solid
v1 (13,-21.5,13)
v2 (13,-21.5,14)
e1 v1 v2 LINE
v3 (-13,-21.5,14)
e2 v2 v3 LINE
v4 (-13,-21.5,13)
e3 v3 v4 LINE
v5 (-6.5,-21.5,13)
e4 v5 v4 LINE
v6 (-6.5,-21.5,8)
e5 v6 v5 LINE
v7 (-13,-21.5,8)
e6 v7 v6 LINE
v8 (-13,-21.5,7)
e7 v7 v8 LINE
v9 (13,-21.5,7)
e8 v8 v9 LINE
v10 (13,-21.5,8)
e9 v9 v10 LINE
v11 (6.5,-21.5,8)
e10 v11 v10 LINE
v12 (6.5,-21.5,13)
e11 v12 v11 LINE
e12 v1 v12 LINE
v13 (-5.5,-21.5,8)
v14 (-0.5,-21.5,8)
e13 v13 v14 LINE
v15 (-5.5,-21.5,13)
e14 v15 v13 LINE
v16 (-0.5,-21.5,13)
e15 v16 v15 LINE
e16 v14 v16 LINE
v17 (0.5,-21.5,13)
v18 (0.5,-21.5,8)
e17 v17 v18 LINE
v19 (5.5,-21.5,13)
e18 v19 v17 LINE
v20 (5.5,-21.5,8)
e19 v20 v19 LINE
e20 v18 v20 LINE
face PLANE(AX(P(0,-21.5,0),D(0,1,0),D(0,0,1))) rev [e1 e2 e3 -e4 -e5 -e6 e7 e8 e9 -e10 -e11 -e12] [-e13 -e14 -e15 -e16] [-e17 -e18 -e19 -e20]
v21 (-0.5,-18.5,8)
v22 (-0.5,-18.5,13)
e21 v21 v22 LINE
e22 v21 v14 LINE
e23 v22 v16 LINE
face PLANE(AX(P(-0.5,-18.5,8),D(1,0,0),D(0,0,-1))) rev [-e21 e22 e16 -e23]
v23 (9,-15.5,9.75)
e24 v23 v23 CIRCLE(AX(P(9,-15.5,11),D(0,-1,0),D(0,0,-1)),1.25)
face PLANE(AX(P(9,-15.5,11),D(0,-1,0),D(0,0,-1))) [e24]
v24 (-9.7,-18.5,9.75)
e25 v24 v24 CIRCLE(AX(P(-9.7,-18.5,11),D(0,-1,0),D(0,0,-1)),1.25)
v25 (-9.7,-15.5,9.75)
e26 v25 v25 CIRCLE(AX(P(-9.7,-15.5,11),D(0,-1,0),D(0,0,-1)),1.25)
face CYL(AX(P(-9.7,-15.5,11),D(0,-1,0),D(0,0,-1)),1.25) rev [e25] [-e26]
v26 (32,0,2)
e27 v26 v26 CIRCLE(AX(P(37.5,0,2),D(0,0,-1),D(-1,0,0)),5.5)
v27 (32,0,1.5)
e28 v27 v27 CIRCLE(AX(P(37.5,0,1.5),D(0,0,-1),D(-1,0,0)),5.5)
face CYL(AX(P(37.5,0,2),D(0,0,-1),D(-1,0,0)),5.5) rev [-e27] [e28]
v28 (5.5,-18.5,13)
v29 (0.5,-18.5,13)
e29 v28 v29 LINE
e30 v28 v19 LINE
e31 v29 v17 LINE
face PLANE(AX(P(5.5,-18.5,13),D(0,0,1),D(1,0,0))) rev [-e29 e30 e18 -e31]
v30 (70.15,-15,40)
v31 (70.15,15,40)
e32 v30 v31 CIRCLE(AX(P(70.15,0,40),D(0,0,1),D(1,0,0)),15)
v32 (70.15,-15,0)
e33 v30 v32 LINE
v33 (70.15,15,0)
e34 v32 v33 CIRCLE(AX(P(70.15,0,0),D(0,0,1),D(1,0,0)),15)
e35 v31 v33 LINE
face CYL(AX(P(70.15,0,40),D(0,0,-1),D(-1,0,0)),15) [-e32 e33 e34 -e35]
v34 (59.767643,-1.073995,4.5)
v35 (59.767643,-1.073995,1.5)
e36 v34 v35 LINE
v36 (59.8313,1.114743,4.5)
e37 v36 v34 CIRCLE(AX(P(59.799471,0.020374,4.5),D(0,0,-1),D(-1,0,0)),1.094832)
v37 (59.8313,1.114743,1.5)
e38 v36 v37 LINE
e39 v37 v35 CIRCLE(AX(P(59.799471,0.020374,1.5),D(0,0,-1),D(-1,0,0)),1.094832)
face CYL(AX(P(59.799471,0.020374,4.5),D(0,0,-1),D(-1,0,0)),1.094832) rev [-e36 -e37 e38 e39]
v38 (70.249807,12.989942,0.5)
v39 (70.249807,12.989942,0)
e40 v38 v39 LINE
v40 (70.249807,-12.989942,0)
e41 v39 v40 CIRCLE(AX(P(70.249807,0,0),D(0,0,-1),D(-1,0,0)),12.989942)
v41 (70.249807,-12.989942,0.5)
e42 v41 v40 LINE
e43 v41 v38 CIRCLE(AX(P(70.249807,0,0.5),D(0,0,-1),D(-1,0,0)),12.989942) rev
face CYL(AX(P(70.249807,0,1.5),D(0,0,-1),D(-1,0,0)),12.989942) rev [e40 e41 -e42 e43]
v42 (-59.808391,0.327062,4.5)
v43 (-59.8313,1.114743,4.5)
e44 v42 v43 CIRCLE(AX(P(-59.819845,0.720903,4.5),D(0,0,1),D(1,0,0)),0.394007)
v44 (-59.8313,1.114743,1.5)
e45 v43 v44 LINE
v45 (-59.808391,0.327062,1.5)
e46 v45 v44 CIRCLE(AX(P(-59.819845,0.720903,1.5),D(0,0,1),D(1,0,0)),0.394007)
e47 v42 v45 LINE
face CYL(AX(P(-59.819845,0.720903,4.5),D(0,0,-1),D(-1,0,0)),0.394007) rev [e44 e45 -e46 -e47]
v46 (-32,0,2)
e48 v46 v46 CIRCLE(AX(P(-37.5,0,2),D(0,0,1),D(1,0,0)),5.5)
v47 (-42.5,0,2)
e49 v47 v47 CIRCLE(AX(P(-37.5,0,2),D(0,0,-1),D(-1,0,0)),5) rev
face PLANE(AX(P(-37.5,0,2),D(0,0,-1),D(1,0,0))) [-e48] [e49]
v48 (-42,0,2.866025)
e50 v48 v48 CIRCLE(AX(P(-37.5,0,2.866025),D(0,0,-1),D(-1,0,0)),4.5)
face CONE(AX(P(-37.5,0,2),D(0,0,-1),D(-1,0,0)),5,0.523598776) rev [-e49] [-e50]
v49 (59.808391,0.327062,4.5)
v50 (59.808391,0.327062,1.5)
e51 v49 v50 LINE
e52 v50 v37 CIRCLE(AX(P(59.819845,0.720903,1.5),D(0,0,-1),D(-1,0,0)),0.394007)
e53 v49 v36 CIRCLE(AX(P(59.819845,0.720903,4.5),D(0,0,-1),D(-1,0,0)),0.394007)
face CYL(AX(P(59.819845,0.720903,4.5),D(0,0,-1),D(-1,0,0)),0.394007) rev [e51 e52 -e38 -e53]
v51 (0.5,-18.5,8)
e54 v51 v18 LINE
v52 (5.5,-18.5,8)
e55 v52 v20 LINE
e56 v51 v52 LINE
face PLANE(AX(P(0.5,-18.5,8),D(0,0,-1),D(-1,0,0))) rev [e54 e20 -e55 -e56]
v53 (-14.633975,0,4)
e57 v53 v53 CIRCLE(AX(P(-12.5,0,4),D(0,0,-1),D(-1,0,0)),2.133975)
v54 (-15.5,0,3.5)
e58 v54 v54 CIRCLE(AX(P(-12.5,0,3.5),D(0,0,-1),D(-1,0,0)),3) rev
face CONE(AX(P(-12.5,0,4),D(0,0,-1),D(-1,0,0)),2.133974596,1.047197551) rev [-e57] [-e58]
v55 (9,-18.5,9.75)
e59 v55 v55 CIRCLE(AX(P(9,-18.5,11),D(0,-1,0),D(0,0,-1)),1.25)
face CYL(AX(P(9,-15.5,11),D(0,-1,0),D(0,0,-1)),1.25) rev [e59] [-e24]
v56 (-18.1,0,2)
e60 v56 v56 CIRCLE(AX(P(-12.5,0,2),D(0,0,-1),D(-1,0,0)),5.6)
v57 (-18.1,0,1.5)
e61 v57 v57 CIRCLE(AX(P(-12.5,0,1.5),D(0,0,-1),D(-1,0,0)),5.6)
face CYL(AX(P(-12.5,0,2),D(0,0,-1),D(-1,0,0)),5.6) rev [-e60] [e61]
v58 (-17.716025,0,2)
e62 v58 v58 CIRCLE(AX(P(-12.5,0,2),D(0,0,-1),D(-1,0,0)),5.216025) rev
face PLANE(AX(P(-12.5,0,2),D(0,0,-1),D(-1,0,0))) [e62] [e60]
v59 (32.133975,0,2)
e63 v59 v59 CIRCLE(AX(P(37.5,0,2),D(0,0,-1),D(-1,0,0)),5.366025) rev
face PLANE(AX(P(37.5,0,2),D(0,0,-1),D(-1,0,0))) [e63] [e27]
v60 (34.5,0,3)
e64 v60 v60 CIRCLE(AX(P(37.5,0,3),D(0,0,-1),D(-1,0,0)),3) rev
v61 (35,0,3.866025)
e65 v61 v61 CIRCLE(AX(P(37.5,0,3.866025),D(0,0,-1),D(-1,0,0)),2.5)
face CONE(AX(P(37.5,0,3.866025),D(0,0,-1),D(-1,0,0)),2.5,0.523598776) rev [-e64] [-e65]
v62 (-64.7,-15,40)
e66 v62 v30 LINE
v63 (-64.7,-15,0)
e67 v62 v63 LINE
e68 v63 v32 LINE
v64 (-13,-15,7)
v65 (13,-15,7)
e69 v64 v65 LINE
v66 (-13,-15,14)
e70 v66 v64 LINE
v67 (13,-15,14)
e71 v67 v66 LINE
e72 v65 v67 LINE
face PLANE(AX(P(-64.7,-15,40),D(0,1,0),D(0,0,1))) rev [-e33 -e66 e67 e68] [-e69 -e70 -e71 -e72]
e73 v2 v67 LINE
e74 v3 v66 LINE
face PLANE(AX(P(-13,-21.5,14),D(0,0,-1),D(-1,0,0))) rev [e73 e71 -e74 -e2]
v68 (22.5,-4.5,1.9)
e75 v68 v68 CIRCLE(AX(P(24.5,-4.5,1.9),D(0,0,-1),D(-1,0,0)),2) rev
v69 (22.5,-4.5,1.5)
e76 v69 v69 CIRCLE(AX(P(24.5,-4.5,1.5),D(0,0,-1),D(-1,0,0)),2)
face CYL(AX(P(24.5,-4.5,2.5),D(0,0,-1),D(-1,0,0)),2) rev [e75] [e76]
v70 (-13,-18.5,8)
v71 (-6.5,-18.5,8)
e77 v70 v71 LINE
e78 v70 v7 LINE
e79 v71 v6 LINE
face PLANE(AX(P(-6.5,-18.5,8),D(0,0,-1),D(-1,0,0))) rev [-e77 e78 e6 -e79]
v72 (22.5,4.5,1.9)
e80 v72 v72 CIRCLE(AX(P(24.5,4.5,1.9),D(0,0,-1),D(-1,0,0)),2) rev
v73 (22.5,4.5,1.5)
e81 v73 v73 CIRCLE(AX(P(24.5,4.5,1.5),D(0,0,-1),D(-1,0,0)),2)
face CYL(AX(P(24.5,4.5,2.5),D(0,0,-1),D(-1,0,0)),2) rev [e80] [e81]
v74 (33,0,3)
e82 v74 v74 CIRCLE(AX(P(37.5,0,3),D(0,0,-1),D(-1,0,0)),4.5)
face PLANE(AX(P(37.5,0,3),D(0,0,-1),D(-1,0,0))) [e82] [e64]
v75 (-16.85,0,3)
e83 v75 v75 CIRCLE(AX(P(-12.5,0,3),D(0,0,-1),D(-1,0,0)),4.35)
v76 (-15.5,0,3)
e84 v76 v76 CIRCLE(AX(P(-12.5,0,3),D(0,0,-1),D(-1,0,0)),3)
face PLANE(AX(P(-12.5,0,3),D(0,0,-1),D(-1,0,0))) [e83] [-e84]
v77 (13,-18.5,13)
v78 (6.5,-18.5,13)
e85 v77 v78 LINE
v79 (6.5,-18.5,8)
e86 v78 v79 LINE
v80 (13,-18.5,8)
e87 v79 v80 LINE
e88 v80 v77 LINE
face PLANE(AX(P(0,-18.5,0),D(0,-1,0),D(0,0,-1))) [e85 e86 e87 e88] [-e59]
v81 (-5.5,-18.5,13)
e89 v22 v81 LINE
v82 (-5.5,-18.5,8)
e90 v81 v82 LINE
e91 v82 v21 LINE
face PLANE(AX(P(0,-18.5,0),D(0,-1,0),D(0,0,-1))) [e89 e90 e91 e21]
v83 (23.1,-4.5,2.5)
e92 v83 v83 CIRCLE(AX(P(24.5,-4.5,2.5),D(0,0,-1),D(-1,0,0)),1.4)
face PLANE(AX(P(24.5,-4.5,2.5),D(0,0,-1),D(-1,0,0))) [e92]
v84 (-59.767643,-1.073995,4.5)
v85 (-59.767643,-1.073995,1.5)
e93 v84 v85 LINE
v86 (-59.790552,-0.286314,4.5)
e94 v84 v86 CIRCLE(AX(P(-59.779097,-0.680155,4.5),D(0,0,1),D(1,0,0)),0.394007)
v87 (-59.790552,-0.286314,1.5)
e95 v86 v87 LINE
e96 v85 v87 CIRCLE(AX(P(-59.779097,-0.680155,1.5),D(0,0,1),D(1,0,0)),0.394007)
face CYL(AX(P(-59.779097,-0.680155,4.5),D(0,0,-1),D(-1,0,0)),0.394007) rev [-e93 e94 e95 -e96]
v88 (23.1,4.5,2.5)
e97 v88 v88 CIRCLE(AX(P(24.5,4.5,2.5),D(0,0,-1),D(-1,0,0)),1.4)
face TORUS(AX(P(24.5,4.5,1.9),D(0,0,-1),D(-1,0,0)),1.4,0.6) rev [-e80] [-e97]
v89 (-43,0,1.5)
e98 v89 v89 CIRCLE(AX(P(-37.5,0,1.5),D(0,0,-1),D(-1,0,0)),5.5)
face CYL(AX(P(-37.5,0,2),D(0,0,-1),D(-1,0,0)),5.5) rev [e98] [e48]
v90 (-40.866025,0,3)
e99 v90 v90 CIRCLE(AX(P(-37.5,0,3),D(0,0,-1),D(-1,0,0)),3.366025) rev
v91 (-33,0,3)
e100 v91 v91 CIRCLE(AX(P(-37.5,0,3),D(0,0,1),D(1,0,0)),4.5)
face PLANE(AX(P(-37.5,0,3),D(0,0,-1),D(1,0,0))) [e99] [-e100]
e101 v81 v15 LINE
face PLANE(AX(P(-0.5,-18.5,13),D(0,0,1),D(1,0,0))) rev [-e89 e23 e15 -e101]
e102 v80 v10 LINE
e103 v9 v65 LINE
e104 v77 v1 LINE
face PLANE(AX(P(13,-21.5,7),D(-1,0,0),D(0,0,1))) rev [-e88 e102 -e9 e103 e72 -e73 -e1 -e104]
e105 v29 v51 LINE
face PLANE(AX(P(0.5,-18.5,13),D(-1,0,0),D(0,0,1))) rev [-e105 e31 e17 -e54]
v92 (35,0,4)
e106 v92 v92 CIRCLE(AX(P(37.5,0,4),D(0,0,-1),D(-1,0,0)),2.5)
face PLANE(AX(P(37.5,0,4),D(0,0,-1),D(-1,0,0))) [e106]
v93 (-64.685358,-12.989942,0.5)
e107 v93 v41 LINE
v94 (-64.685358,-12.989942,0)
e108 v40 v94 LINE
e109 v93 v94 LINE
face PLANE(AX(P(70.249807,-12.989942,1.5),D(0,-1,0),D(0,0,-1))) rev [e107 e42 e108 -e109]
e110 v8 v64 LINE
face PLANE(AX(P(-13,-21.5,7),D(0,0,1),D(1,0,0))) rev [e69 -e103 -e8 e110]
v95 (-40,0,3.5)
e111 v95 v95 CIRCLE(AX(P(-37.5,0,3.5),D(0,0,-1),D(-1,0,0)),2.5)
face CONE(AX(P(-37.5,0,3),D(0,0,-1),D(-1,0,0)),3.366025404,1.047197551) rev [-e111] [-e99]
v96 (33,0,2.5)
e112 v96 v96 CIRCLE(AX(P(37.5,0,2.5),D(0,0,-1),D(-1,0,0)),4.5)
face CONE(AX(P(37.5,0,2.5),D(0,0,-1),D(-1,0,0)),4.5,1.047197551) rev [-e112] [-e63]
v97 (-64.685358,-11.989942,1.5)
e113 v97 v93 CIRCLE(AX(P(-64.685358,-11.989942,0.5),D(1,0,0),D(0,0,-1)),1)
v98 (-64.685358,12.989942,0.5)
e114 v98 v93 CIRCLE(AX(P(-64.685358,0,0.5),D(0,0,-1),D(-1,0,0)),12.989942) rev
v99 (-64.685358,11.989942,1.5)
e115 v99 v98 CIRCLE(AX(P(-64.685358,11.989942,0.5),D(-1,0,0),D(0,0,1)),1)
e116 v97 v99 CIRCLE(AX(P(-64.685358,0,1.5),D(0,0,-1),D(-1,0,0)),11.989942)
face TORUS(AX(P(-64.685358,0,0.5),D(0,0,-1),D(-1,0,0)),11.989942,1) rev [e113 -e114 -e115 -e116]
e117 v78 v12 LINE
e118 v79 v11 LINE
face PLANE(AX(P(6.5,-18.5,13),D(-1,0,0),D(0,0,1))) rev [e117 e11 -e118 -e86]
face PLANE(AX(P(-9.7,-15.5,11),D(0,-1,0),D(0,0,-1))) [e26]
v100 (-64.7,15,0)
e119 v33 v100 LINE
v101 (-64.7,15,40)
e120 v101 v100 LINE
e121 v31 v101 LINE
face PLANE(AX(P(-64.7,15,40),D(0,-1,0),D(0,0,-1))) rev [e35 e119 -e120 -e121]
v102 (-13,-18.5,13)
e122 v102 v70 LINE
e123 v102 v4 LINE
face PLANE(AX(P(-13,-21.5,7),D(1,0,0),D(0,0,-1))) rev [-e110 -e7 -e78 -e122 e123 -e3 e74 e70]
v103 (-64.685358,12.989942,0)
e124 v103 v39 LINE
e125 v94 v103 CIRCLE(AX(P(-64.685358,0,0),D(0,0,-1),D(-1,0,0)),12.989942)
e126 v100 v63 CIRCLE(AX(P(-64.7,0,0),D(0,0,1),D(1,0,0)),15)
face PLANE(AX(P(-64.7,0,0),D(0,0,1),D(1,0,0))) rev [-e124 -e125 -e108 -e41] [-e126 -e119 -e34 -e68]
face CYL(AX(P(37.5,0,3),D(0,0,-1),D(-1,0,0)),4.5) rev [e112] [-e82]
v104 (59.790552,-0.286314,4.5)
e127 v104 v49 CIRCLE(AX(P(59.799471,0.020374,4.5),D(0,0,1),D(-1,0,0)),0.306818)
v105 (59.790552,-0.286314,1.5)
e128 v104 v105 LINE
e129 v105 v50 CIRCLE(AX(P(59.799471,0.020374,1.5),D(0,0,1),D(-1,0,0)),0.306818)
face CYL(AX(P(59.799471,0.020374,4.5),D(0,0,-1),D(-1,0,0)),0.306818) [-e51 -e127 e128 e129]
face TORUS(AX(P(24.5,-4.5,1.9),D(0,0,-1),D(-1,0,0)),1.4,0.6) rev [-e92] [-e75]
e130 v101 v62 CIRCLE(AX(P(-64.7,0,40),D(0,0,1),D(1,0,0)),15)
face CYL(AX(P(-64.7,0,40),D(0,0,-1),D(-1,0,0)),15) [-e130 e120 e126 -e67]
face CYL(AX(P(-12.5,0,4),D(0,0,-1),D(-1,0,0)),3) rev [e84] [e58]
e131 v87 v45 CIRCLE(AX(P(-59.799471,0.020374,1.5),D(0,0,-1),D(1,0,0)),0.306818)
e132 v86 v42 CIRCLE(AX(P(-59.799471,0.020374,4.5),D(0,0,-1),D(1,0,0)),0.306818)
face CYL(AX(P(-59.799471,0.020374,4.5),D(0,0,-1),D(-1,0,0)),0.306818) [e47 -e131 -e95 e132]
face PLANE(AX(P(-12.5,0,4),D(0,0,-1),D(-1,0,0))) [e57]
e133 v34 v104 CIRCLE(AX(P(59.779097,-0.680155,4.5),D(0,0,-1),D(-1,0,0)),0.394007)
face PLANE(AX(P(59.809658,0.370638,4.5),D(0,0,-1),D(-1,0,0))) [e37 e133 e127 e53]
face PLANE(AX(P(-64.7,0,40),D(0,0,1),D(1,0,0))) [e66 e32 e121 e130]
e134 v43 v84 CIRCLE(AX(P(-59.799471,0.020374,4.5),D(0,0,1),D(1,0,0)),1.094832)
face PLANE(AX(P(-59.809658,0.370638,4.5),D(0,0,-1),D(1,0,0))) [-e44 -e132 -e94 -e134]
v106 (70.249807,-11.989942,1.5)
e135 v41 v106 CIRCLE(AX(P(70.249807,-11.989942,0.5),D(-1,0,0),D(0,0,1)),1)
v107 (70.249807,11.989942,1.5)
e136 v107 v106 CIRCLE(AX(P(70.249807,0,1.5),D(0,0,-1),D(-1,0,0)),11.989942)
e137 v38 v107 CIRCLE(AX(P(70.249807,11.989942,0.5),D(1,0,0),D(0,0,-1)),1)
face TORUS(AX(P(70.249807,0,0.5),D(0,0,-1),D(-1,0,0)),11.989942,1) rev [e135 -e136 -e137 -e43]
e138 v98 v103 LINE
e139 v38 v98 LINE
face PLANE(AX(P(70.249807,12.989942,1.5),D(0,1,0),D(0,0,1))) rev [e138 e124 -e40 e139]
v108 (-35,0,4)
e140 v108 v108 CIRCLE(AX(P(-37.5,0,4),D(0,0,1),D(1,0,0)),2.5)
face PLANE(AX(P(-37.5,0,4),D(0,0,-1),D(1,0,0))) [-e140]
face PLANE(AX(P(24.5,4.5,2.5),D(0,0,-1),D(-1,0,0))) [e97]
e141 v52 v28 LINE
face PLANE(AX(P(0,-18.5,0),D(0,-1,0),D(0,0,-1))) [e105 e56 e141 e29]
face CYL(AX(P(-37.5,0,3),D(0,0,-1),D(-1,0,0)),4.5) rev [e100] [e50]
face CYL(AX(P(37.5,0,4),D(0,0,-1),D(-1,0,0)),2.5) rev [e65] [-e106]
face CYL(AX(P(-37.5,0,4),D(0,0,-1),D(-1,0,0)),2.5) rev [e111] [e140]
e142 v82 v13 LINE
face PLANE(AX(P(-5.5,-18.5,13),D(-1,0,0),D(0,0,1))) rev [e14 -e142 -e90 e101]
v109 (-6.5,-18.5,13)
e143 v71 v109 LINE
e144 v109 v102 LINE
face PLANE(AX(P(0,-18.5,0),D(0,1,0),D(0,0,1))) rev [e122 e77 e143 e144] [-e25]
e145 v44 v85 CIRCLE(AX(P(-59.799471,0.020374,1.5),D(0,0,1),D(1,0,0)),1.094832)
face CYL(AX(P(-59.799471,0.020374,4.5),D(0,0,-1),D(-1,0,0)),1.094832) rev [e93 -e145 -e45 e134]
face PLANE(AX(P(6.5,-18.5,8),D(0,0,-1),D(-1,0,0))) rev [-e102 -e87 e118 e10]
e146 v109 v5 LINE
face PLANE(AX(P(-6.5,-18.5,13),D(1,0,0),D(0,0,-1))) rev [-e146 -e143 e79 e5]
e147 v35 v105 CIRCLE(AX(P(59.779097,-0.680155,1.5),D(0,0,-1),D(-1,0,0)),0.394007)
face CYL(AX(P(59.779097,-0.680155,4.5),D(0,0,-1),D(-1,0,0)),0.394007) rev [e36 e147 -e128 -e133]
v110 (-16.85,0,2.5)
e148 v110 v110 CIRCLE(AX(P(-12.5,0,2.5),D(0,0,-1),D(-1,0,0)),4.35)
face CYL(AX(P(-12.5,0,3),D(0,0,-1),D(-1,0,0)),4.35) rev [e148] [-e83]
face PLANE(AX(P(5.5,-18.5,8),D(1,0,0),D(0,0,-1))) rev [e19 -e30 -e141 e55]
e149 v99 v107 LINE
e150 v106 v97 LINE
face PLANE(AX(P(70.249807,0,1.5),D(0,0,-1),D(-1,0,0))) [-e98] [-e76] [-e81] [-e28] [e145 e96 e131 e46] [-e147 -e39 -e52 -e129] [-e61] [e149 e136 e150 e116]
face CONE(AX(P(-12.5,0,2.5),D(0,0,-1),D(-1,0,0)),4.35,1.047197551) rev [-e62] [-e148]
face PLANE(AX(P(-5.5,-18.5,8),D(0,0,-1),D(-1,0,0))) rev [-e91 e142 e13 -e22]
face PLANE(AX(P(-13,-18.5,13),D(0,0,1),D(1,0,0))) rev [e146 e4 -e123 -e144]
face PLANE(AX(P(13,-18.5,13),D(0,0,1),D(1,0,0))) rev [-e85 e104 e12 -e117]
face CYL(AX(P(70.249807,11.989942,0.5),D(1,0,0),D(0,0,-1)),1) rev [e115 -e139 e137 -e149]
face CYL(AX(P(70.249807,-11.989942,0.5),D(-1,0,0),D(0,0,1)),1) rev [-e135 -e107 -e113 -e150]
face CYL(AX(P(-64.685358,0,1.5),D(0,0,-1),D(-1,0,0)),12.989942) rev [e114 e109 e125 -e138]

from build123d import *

# Parameters (mm, degrees)
EXTRUDE_1_DEPTH             = 40
SKETCH_2_R                  = 7.25
CUT_EXTRUDE_1_DEPTH         = 1
CHAMFER_1_SIZE              = 0.5
SKETCH_5_R                  = 5.5
CUT_EXTRUDE_2_DEPTH         = 1
CHAMFER_2_SIZE              = 0.5
CHAMFER_2_SIZE2             = 0.288675135
SKETCH_6_R                  = 4.5
CUT_EXTRUDE_3_DEPTH         = 1
CHAMFER_3_SIZE              = 0.5
CHAMFER_3_SIZE2             = 0.866025404
SKETCH_7_R                  = 2.5
CUT_EXTRUDE_4_DEPTH         = 1
CHAMFER_4_SIZE              = 0.5
CHAMFER_4_SIZE2             = 0.866025404
CHAMFER_1_OF_MIRROR_3_SIZE  = 0.5
CHAMFER_2_OF_MIRROR_3_SIZE2 = 0.288675135
CHAMFER_2_OF_MIRROR_3_SIZE  = 0.5
CHAMFER_3_OF_MIRROR_3_SIZE2 = 0.866025404
CHAMFER_3_OF_MIRROR_3_SIZE  = 0.5
CHAMFER_4_OF_MIRROR_3_SIZE2 = 0.5
CHAMFER_4_OF_MIRROR_3_SIZE  = 0.866025404
SKETCH_9_R                  = 7.25
CUT_EXTRUDE_5_DEPTH         = 1
CHAMFER_5_SIZE              = 0.5
SKETCH_10_R                 = 5.6
CUT_EXTRUDE_6_DEPTH         = 1
CHAMFER_6_SIZE              = 0.5
CHAMFER_6_SIZE2             = 0.866025404
SKETCH_11_R                 = 4.35
CUT_EXTRUDE_7_DEPTH         = 1
CHAMFER_7_SIZE              = 0.5
CHAMFER_7_SIZE2             = 0.866025404
SKETCH_12_R                 = 3
CUT_EXTRUDE_8_DEPTH         = 1
CHAMFER_8_SIZE              = 0.5
CHAMFER_8_SIZE2             = 0.866025404
CUT_EXTRUDE_9_DEPTH         = 1.5
FILLET_1_R                  = 1
SKETCH_14_R                 = 2
CUT_EXTRUDE_10_DEPTH        = 1
FILLET_2_R                  = 0.6
SKETCH_15_R                 = 2
CUT_EXTRUDE_11_DEPTH        = 1
FILLET_3_R                  = 0.6
CUT_EXTRUDE_12_DEPTH        = 3
SKETCH_17_W                 = 26
SKETCH_17_H                 = 7
EXTRUDE_2_DEPTH             = 6.5
SKETCH_18_W                 = 6.5
SKETCH_18_H                 = 5
SKETCH_18_W_2               = 5
CUT_EXTRUDE_13_DEPTH        = 3
SKETCH_19_R                 = 1.25
CUT_EXTRUDE_14_DEPTH        = 3


with BuildPart() as part:
    # 草图1 → 凸台-拉伸1 (new body)
    with BuildSketch(Plane.XY):
        with BuildLine():
            Line((-64.7, 15), (70.15, 15))
            ThreePointArc((70.15, 15), (85.15, 0), (70.15, -15))
            Line((70.15, -15), (-64.7, -15))
            ThreePointArc((-64.7, -15), (-79.7, 0), (-64.7, 15))
        make_face()
    extrude(amount=EXTRUDE_1_DEPTH)

    # 草图2 → 切除-拉伸1 (cut)
    with BuildSketch(Plane(origin=(0, 0, 0), x_dir=(-1, 0, 0), z_dir=(0, 0, -1))):
        with Locations((-37.5, 0)):
            Circle(SKETCH_2_R)
    cut_extrude_1 = extrude(amount=-CUT_EXTRUDE_1_DEPTH, mode=Mode.SUBTRACT)

    # 倒角1
    chamfer_1_edges = [part.edges().sort_by_distance(p)[0] for p in [
        (44.75, 0, 1),
        (44.75, 0, 0),
    ]]
    chamfer(chamfer_1_edges, length=CHAMFER_1_SIZE - 0.0001)  # a hair under: the kernel refuses the full size

    # 草图5 → 切除-拉伸2 (cut)
    with BuildSketch(Plane(origin=(0, 0, 1), x_dir=(-1, 0, 0), z_dir=(0, 0, -1))):
        with Locations((-37.5, 0)):
            Circle(SKETCH_5_R)
    cut_extrude_2 = extrude(amount=-CUT_EXTRUDE_2_DEPTH, mode=Mode.SUBTRACT)

    # 倒角2
    chamfer_2_edges = [part.edges().sort_by_distance(p)[0] for p in [
        (43, 0, 1),
    ]]
    chamfer_2_side = [part.faces().sort_by_distance(p)[0] for p in [
        (43, 0, 1.5),
    ]]
    chamfer(chamfer_2_edges, length=CHAMFER_2_SIZE, length2=CHAMFER_2_SIZE2, reference=chamfer_2_side[0])

    # 草图6 → 切除-拉伸3 (cut)
    with BuildSketch(Plane(origin=(0, 0, 2), x_dir=(-1, 0, 0), z_dir=(0, 0, -1))):
        with Locations((-37.5, 0)):
            Circle(SKETCH_6_R)
    cut_extrude_3 = extrude(amount=-CUT_EXTRUDE_3_DEPTH, mode=Mode.SUBTRACT)

    # 倒角3
    chamfer_3_edges = [part.edges().sort_by_distance(p)[0] for p in [
        (42, 0, 2),
    ]]
    chamfer_3_side = [part.faces().sort_by_distance(p)[0] for p in [
        (42, 0, 2.5),
    ]]
    chamfer(chamfer_3_edges, length=CHAMFER_3_SIZE, length2=CHAMFER_3_SIZE2, reference=chamfer_3_side[0])

    # 草图7 → 切除-拉伸4 (cut)
    with BuildSketch(Plane(origin=(0, 0, 3), x_dir=(-1, 0, 0), z_dir=(0, 0, -1))):
        with Locations((-37.5, 0)):
            Circle(SKETCH_7_R)
    cut_extrude_4 = extrude(amount=-CUT_EXTRUDE_4_DEPTH, mode=Mode.SUBTRACT)

    # 倒角4
    chamfer_4_edges = [part.edges().sort_by_distance(p)[0] for p in [
        (40, 0, 3),
    ]]
    chamfer_4_side = [part.faces().sort_by_distance(p)[0] for p in [
        (41.872720779, 0, 3),
    ]]
    chamfer(chamfer_4_edges, length=CHAMFER_4_SIZE, length2=CHAMFER_4_SIZE2, reference=chamfer_4_side[0])

    # 镜向3: 切除-拉伸1, 切除-拉伸2, 切除-拉伸3, 切除-拉伸4 across plane
    add(cut_extrude_1.mirror(Plane(origin=(0, 0, 0), x_dir=(0, 0, 1), z_dir=(1, 0, 0))), mode=Mode.SUBTRACT)
    add(cut_extrude_2.mirror(Plane(origin=(0, 0, 0), x_dir=(0, 0, 1), z_dir=(1, 0, 0))), mode=Mode.SUBTRACT)
    add(cut_extrude_3.mirror(Plane(origin=(0, 0, 0), x_dir=(0, 0, 1), z_dir=(1, 0, 0))), mode=Mode.SUBTRACT)
    add(cut_extrude_4.mirror(Plane(origin=(0, 0, 0), x_dir=(0, 0, 1), z_dir=(1, 0, 0))), mode=Mode.SUBTRACT)

    # 倒角1 of 镜向3
    chamfer_1_of_mirror_3_edges = [part.edges().sort_by_distance(p)[0] for p in [
        (-44.75, 0, 1),
        (-44.75, 0, 0),
    ]]
    chamfer(chamfer_1_of_mirror_3_edges, length=CHAMFER_1_OF_MIRROR_3_SIZE - 0.0001)  # a hair under: the kernel refuses the full size

    # 倒角2 of 镜向3
    chamfer_2_of_mirror_3_edges = [part.edges().sort_by_distance(p)[0] for p in [
        (-43, 0, 1),
    ]]
    chamfer(chamfer_2_of_mirror_3_edges, length=CHAMFER_2_OF_MIRROR_3_SIZE, length2=CHAMFER_2_OF_MIRROR_3_SIZE2)

    # 倒角3 of 镜向3
    chamfer_3_of_mirror_3_edges = [part.edges().sort_by_distance(p)[0] for p in [
        (-42, 0, 2),
    ]]
    chamfer(chamfer_3_of_mirror_3_edges, length=CHAMFER_3_OF_MIRROR_3_SIZE, length2=CHAMFER_3_OF_MIRROR_3_SIZE2)

    # 倒角4 of 镜向3
    chamfer_4_of_mirror_3_edges = [part.edges().sort_by_distance(p)[0] for p in [
        (-40, 0, 3),
    ]]
    chamfer(chamfer_4_of_mirror_3_edges, length=CHAMFER_4_OF_MIRROR_3_SIZE, length2=CHAMFER_4_OF_MIRROR_3_SIZE2)

    # 草图9 → 切除-拉伸5 (cut)
    with BuildSketch(Plane(origin=(0, 0, 0), x_dir=(-1, 0, 0), z_dir=(0, 0, -1))):
        with Locations((12.5, 0)):
            Circle(SKETCH_9_R)
    extrude(amount=-CUT_EXTRUDE_5_DEPTH, mode=Mode.SUBTRACT)

    # 倒角5
    chamfer_5_edges = [part.edges().sort_by_distance(p)[0] for p in [
        (-5.25, 0, 1),
    ]]
    chamfer(chamfer_5_edges, length=CHAMFER_5_SIZE)

    # 草图10 → 切除-拉伸6 (cut)
    with BuildSketch(Plane(origin=(0, 0, 1), x_dir=(-1, 0, 0), z_dir=(0, 0, -1))):
        with Locations((12.5, 0)):
            Circle(SKETCH_10_R)
    extrude(amount=-CUT_EXTRUDE_6_DEPTH, mode=Mode.SUBTRACT)

    # 倒角6
    chamfer_6_edges = [part.edges().sort_by_distance(p)[0] for p in [
        (-6.9, 0, 1),
    ]]
    chamfer_6_side = [part.faces().sort_by_distance(p)[0] for p in [
        (-6.9, 0, 1.5),
    ]]
    chamfer(chamfer_6_edges, length=CHAMFER_6_SIZE, length2=CHAMFER_6_SIZE2, reference=chamfer_6_side[0])

    # 草图11 → 切除-拉伸7 (cut)
    with BuildSketch(Plane(origin=(0, 0, 2), x_dir=(-1, 0, 0), z_dir=(0, 0, -1))):
        with Locations((12.5, 0)):
            Circle(SKETCH_11_R)
    extrude(amount=-CUT_EXTRUDE_7_DEPTH, mode=Mode.SUBTRACT)

    # 倒角7
    chamfer_7_edges = [part.edges().sort_by_distance(p)[0] for p in [
        (-8.15, 0, 2),
    ]]
    chamfer_7_side = [part.faces().sort_by_distance(p)[0] for p in [
        (-8.15, 0, 2.5),
    ]]
    chamfer(chamfer_7_edges, length=CHAMFER_7_SIZE, length2=CHAMFER_7_SIZE2, reference=chamfer_7_side[0])

    # 草图12 → 切除-拉伸8 (cut)
    with BuildSketch(Plane(origin=(0, 0, 3), x_dir=(-1, 0, 0), z_dir=(0, 0, -1))):
        with Locations((12.5, 0)):
            Circle(SKETCH_12_R)
    extrude(amount=-CUT_EXTRUDE_8_DEPTH, mode=Mode.SUBTRACT)

    # 倒角8
    chamfer_8_edges = [part.edges().sort_by_distance(p)[0] for p in [
        (-9.5, 0, 4),
    ]]
    chamfer_8_side = [part.faces().sort_by_distance(p)[0] for p in [
        (-9.5, 0, 3.5),
    ]]
    chamfer(chamfer_8_edges, length=CHAMFER_8_SIZE, length2=CHAMFER_8_SIZE2, reference=chamfer_8_side[0])

    # 草图13 → 切除-拉伸9 (cut)
    with BuildSketch(Plane(origin=(0, 0, 0), x_dir=(-1, 0, 0), z_dir=(0, 0, -1))):
        with BuildLine():
            Line((-70.249806967, 12.989941679), (64.685358142, 12.989941679))
            ThreePointArc((64.685358142, 12.989941679), (77.675299821, 0), (64.685358142, -12.989941679))
            Line((64.685358142, -12.989941679), (-70.249806967, -12.989941679))
            ThreePointArc((-70.249806967, -12.989941679), (-83.239748646, 0), (-70.249806967, 12.989941679))
        make_face()
    extrude(amount=-CUT_EXTRUDE_9_DEPTH, mode=Mode.SUBTRACT)

    # 圆角1
    fillet_1_edges = [part.edges().sort_by_distance(p)[0] for p in [
        (83.239748646, 0, 1.5),
        (2.782224413, 12.989941679, 1.5),
        (-77.675299821, 0, 1.5),
        (2.782224413, -12.989941679, 1.5),
    ]]
    fillet(fillet_1_edges, radius=FILLET_1_R)

    # 草图14 → 切除-拉伸10 (cut)
    with BuildSketch(Plane(origin=(0, 0, 1.5), x_dir=(-1, 0, 0), z_dir=(0, 0, -1))):
        with Locations((-24.5, 4.5)):
            Circle(SKETCH_14_R)
    extrude(amount=-CUT_EXTRUDE_10_DEPTH, mode=Mode.SUBTRACT)

    # 圆角2
    fillet_2_edges = [part.edges().sort_by_distance(p)[0] for p in [
        (26.5, 4.5, 2.5),
    ]]
    fillet(fillet_2_edges, radius=FILLET_2_R)

    # 草图15 → 切除-拉伸11 (cut)
    with BuildSketch(Plane(origin=(0, 0, 1.5), x_dir=(-1, 0, 0), z_dir=(0, 0, -1))):
        with Locations((-24.5, -4.5)):
            Circle(SKETCH_15_R)
    extrude(amount=-CUT_EXTRUDE_11_DEPTH, mode=Mode.SUBTRACT)

    # 圆角3
    fillet_3_edges = [part.edges().sort_by_distance(p)[0] for p in [
        (26.5, -4.5, 2.5),
    ]]
    fillet(fillet_3_edges, radius=FILLET_3_R)

    # 草图16 → 切除-拉伸12 (cut)
    with BuildSketch(Plane(origin=(0, 0, 1.5), x_dir=(-1, 0, 0), z_dir=(0, 0, -1))):
        with BuildLine():
            ThreePointArc((-59.831299631, 1.114743341), (-60.893840639, -0.011454355), (-59.767642942, -1.073995363))
            ThreePointArc((-59.767642942, -1.073995363), (-59.385256659, -0.668700369), (-59.790551653, -0.286314086))
            ThreePointArc((-59.790551653, -0.286314086), (-60.106159361, 0.011454355), (-59.80839092, 0.327062064))
            ThreePointArc((-59.80839092, 0.327062064), (-59.426004637, 0.732357058), (-59.831299631, 1.114743341))
        make_face()
    cut_extrude_12 = extrude(amount=-CUT_EXTRUDE_12_DEPTH, mode=Mode.SUBTRACT)

    # 镜向6: 切除-拉伸12 across plane
    add(cut_extrude_12.mirror(Plane(origin=(0, 0, 0), x_dir=(0, 0, 1), z_dir=(1, 0, 0))), mode=Mode.SUBTRACT)

    # 草图17 → 凸台-拉伸2 (add)
    with BuildSketch(Plane.XZ.offset(15)):
        with Locations((0, 10.5)):
            Rectangle(SKETCH_17_W, SKETCH_17_H)
    extrude(amount=EXTRUDE_2_DEPTH)

    # 草图18 → 切除-拉伸13 (cut)
    with BuildSketch(Plane.XZ.offset(21.5)):
        with Locations((-9.75, 10.5)):
            Rectangle(SKETCH_18_W, SKETCH_18_H)
        with Locations((9.75, 10.5)):
            Rectangle(SKETCH_18_W, SKETCH_18_H)
        with Locations((-3, 10.5)):
            Rectangle(SKETCH_18_W_2, SKETCH_18_H)
        with Locations((3, 10.5)):
            Rectangle(SKETCH_18_W_2, SKETCH_18_H)
    extrude(amount=-CUT_EXTRUDE_13_DEPTH, mode=Mode.SUBTRACT)

    # 草图19 → 切除-拉伸14 (cut)
    with BuildSketch(Plane.XZ.offset(18.5)):
        with Locations(Location((9, 11, 0), (0, 0, 270))):
            Circle(SKETCH_19_R)
        with Locations(Location((-9.7, 11, 0), (0, 0, 270))):
            Circle(SKETCH_19_R)
    extrude(amount=-CUT_EXTRUDE_14_DEPTH, mode=Mode.SUBTRACT)


solid = part.part
